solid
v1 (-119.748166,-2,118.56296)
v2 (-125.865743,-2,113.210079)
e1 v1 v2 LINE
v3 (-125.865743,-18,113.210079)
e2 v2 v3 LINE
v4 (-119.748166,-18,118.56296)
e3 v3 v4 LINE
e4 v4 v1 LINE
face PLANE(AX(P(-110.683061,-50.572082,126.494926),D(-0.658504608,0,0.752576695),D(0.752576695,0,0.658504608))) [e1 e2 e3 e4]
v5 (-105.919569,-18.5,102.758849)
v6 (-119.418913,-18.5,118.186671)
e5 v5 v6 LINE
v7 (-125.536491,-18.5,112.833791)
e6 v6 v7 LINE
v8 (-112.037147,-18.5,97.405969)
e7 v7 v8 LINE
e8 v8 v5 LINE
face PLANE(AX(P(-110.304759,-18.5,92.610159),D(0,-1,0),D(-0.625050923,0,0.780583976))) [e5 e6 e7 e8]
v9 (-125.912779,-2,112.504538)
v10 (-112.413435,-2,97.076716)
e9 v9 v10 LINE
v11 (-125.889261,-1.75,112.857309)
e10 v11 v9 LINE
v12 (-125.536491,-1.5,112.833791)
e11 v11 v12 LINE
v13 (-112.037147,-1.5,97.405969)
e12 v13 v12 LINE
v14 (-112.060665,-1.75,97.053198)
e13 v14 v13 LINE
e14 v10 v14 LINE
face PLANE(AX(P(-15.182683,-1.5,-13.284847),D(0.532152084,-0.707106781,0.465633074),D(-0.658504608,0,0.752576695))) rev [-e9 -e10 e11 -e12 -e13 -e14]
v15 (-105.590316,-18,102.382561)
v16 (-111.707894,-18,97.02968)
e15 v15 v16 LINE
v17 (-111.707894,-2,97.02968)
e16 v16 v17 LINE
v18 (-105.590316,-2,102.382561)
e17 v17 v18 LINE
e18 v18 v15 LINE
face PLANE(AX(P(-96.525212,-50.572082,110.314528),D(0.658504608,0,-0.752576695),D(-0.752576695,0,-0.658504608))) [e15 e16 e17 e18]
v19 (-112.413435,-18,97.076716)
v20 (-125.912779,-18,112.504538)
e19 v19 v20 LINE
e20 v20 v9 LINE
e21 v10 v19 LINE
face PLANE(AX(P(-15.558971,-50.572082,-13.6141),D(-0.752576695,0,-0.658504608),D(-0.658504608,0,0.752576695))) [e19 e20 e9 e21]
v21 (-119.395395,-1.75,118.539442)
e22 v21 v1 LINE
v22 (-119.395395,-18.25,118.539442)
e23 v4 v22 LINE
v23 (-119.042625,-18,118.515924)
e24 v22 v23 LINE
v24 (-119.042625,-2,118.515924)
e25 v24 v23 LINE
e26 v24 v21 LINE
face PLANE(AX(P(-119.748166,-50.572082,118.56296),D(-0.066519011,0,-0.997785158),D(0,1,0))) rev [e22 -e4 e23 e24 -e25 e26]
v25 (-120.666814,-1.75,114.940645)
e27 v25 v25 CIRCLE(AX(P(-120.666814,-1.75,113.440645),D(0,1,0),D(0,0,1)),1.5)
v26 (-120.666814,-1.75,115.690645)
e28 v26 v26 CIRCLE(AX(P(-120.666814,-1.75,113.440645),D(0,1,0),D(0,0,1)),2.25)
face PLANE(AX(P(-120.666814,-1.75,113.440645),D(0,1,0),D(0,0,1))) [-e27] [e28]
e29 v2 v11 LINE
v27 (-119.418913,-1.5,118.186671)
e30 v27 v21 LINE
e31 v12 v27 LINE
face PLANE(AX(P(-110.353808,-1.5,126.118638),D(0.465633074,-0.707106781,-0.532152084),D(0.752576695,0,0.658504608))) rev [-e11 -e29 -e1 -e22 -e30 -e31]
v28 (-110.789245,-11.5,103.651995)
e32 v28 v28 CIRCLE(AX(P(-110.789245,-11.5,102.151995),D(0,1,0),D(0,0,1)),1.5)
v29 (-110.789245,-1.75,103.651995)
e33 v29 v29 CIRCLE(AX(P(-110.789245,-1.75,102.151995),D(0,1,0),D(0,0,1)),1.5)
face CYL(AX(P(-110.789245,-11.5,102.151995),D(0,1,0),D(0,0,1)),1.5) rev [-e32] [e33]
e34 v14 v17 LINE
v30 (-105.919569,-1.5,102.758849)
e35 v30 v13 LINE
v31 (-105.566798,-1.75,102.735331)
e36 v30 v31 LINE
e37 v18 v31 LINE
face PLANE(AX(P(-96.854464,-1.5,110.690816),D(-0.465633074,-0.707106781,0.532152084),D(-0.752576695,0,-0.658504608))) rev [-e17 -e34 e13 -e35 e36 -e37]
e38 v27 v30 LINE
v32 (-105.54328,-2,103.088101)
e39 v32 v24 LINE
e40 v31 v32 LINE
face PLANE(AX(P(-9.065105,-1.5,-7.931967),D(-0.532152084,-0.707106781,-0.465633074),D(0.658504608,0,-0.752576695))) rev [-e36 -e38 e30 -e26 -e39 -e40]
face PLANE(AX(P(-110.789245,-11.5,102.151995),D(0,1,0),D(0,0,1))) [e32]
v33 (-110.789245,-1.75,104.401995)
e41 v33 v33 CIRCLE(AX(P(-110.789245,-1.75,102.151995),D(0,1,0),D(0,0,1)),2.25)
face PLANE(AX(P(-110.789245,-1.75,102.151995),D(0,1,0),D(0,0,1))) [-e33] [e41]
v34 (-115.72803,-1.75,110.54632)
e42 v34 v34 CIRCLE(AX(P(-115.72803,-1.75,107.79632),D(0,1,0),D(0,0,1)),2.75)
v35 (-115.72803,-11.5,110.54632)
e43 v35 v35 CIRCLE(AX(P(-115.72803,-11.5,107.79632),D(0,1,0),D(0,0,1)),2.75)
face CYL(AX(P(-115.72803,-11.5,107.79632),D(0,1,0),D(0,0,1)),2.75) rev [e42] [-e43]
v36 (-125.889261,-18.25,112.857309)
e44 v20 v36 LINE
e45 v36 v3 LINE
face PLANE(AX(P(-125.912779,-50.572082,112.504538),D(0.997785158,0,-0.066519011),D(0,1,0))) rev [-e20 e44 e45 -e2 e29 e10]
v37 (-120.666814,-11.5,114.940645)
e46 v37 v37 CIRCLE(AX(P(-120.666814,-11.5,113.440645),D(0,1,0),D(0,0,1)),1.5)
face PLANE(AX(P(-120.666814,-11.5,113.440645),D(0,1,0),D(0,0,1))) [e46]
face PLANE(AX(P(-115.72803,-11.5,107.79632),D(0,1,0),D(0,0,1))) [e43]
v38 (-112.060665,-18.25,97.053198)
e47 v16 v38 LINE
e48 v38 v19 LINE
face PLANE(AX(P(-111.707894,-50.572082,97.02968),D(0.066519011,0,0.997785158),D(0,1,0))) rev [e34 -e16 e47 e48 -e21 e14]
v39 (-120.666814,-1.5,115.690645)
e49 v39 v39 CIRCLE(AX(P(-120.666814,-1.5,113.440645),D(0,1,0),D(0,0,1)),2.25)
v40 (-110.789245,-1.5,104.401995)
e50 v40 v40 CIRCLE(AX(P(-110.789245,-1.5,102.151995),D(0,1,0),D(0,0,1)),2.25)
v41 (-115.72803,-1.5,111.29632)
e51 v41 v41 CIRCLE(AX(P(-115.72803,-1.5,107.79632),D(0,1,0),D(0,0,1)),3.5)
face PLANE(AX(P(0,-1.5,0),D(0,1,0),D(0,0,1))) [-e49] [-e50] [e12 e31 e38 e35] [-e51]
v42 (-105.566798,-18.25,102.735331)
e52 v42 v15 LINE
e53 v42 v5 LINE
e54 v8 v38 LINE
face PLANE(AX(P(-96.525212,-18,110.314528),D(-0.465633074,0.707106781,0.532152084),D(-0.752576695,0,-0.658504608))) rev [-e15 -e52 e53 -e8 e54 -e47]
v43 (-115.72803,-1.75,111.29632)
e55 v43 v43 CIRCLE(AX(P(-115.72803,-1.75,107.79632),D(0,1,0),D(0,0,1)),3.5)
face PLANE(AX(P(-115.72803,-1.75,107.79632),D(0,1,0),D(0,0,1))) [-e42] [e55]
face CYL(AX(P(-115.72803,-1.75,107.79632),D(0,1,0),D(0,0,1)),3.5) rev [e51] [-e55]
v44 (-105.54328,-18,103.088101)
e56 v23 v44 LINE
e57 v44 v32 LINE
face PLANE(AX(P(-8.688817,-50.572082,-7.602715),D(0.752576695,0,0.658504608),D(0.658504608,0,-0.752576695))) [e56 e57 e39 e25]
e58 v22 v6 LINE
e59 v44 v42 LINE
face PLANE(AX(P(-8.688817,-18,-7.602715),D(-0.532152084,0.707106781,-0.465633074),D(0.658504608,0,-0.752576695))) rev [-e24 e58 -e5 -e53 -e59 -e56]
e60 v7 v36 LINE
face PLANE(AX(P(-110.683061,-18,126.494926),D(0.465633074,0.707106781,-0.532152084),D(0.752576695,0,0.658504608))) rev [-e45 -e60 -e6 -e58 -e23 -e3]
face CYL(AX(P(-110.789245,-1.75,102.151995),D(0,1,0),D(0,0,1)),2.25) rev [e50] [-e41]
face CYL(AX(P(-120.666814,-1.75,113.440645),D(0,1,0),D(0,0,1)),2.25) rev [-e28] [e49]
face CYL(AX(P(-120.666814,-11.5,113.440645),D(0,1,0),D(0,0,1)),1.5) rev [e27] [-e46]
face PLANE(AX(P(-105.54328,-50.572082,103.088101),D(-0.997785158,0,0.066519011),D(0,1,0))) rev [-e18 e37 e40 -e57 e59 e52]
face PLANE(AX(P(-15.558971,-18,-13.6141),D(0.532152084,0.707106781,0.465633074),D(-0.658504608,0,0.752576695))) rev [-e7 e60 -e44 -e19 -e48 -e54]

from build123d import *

# Parameters (mm, degrees)
BOSS_EXTRUDE1_START = -1.5
BOSS_EXTRUDE1_DEPTH = 17
CHAMFER1_SIZE       = 0.5
CHAMFER2_SIZE       = 0.5
SKETCH3_R           = 2.25
SKETCH3_R_2         = 3.5
CUT_EXTRUDE1_DEPTH  = 0.25
SKETCH4_R           = 1.5
SKETCH4_R_2         = 2.75
CUT_EXTRUDE2_DEPTH  = 10


with BuildPart() as part:
    # Sketch1 → Boss-Extrude1 (new body)
    with BuildSketch(Plane(origin=(0, 0, 0), x_dir=(1, 0, 0), z_dir=(0, 1, 0)).offset(BOSS_EXTRUDE1_START)):
        Polygon((-119.371877221, -118.892211925), (-105.214028152, -102.711812989), (-112.084182588, -96.700427857), (-126.242031658, -112.880826794), align=None)
    extrude(amount=-BOSS_EXTRUDE1_DEPTH)

    # Chamfer1
    chamfer1_edges = [part.edges().sort_by_distance(p)[0] for p in [
        (-119.371877221, -10, 118.892211925),
        (-105.214028152, -10, 102.711812989),
        (-112.084182588, -10, 96.700427857),
        (-126.242031658, -10, 112.880826794),
    ]]
    chamfer(chamfer1_edges, length=CHAMFER1_SIZE)

    # Chamfer2
    # the kernel refuses this chamfer: 0.5 mm, written as the material it takes off along each edge
    with BuildSketch(Plane(origin=(-104.622622158, -18.5, 103.229293234), x_dir=(-0.6582556384124536, -0.027495876610589123, 0.7522921581856536), z_dir=(-0.7525766947068745, 0, -0.6585046078685219)), Plane(origin=(-126.833437652, -18.5, 112.363346549), x_dir=(0.6582556384124544, -0.027495876610588624, -0.752292158185653), z_dir=(0.7525766947068739, 0, 0.6585046078685227))) as chamfer2_piece_1:
        Polygon((CHAMFER2_SIZE * 0.999621916911, CHAMFER2_SIZE * 0.0274958766106), (-CHAMFER2_SIZE * 0.0274958766106, CHAMFER2_SIZE * 0.999621916911), (0, 0), align=None)
    extrude(amount=10.700525914, mode=Mode.SUBTRACT)
    with BuildSketch(Plane(origin=(-111.566702344, -18.5, 96.109021863), x_dir=(0.7522921581856542, -0.027495876610589123, 0.6582556384124529), z_dir=(-0.6585046078685213, 0, 0.7525766947068752)), Plane(origin=(-119.889357466, -1.5, 119.483617919), x_dir=(0.02069275593768218, -0.9996219169112961, 0.018106161445472113), z_dir=(0.6585046078685223, 0, -0.7525766947068742))) as chamfer2_piece_2:
        Polygon((CHAMFER2_SIZE * 0.999621916911, CHAMFER2_SIZE * 0.0274958766106), (-CHAMFER2_SIZE * 0.0274958766106, CHAMFER2_SIZE * 0.999621916911), (0, 0), align=None)
    extrude(amount=23.071682988, mode=Mode.SUBTRACT)
    with BuildSketch(Plane(origin=(-119.889357466, -18.5, 119.483617919), x_dir=(0.020692755937682127, 0.9996219169112961, 0.018106161445472065), z_dir=(0.6585046078685223, 0, -0.7525766947068742)), Plane(origin=(-111.566702344, -1.5, 96.109021863), x_dir=(0.7522921581856542, 0.027495876610586535, 0.6582556384124529), z_dir=(-0.6585046078685213, 0, 0.7525766947068752))) as chamfer2_piece_3:
        Polygon((CHAMFER2_SIZE * 0.999621916911, -CHAMFER2_SIZE * 0.0274958766106), (-CHAMFER2_SIZE * 0.0274958766106, -CHAMFER2_SIZE * 0.999621916911), (0, 0), align=None)
    extrude(amount=23.071682988, mode=Mode.SUBTRACT)
    with BuildSketch(Plane(origin=(-104.622622158, -1.5, 103.229293234), x_dir=(-0.6582556384124536, 0.027495876610586965, 0.7522921581856536), z_dir=(-0.7525766947068745, 0, -0.6585046078685219)), Plane(origin=(-126.833437652, -1.5, 112.363346549), x_dir=(0.6582556384124544, 0.027495876610586036, -0.752292158185653), z_dir=(0.7525766947068739, 0, 0.6585046078685227))) as chamfer2_piece_4:
        Polygon((CHAMFER2_SIZE * 0.999621916911, -CHAMFER2_SIZE * 0.0274958766106), (-CHAMFER2_SIZE * 0.0274958766106, -CHAMFER2_SIZE * 0.999621916911), (0, 0), align=None)
    extrude(amount=10.700525914, mode=Mode.SUBTRACT)

    # Sketch3 → Cut-Extrude1 (cut)
    with BuildSketch(Plane(origin=(0, -1.5, 0), x_dir=(1, 0, 0), z_dir=(0, 1, 0))):
        with Locations(Location((-110.789245346, -102.151994681, 0), (0, 0, 270))):
            Circle(SKETCH3_R)
        with Locations(Location((-115.728029905, -107.796319891, 0), (0, 0, 270))):
            Circle(SKETCH3_R_2)
        with Locations(Location((-120.666814464, -113.440645102, 0), (0, 0, 270))):
            Circle(SKETCH3_R)
    extrude(amount=-CUT_EXTRUDE1_DEPTH, mode=Mode.SUBTRACT)

    # Sketch4 → Cut-Extrude2 (cut)
    with BuildSketch(Plane(origin=(0, -1.5, 0), x_dir=(1, 0, 0), z_dir=(0, 1, 0))):
        with Locations(Location((-110.789245346, -102.151994681, 0), (0, 0, 270))):
            Circle(SKETCH4_R)
        with Locations(Location((-115.728029905, -107.796319891, 0), (0, 0, 270))):
            Circle(SKETCH4_R_2)
        with Locations(Location((-120.666814464, -113.440645102, 0), (0, 0, 270))):
            Circle(SKETCH4_R)
    extrude(amount=-CUT_EXTRUDE2_DEPTH, mode=Mode.SUBTRACT)


solid = part.part
